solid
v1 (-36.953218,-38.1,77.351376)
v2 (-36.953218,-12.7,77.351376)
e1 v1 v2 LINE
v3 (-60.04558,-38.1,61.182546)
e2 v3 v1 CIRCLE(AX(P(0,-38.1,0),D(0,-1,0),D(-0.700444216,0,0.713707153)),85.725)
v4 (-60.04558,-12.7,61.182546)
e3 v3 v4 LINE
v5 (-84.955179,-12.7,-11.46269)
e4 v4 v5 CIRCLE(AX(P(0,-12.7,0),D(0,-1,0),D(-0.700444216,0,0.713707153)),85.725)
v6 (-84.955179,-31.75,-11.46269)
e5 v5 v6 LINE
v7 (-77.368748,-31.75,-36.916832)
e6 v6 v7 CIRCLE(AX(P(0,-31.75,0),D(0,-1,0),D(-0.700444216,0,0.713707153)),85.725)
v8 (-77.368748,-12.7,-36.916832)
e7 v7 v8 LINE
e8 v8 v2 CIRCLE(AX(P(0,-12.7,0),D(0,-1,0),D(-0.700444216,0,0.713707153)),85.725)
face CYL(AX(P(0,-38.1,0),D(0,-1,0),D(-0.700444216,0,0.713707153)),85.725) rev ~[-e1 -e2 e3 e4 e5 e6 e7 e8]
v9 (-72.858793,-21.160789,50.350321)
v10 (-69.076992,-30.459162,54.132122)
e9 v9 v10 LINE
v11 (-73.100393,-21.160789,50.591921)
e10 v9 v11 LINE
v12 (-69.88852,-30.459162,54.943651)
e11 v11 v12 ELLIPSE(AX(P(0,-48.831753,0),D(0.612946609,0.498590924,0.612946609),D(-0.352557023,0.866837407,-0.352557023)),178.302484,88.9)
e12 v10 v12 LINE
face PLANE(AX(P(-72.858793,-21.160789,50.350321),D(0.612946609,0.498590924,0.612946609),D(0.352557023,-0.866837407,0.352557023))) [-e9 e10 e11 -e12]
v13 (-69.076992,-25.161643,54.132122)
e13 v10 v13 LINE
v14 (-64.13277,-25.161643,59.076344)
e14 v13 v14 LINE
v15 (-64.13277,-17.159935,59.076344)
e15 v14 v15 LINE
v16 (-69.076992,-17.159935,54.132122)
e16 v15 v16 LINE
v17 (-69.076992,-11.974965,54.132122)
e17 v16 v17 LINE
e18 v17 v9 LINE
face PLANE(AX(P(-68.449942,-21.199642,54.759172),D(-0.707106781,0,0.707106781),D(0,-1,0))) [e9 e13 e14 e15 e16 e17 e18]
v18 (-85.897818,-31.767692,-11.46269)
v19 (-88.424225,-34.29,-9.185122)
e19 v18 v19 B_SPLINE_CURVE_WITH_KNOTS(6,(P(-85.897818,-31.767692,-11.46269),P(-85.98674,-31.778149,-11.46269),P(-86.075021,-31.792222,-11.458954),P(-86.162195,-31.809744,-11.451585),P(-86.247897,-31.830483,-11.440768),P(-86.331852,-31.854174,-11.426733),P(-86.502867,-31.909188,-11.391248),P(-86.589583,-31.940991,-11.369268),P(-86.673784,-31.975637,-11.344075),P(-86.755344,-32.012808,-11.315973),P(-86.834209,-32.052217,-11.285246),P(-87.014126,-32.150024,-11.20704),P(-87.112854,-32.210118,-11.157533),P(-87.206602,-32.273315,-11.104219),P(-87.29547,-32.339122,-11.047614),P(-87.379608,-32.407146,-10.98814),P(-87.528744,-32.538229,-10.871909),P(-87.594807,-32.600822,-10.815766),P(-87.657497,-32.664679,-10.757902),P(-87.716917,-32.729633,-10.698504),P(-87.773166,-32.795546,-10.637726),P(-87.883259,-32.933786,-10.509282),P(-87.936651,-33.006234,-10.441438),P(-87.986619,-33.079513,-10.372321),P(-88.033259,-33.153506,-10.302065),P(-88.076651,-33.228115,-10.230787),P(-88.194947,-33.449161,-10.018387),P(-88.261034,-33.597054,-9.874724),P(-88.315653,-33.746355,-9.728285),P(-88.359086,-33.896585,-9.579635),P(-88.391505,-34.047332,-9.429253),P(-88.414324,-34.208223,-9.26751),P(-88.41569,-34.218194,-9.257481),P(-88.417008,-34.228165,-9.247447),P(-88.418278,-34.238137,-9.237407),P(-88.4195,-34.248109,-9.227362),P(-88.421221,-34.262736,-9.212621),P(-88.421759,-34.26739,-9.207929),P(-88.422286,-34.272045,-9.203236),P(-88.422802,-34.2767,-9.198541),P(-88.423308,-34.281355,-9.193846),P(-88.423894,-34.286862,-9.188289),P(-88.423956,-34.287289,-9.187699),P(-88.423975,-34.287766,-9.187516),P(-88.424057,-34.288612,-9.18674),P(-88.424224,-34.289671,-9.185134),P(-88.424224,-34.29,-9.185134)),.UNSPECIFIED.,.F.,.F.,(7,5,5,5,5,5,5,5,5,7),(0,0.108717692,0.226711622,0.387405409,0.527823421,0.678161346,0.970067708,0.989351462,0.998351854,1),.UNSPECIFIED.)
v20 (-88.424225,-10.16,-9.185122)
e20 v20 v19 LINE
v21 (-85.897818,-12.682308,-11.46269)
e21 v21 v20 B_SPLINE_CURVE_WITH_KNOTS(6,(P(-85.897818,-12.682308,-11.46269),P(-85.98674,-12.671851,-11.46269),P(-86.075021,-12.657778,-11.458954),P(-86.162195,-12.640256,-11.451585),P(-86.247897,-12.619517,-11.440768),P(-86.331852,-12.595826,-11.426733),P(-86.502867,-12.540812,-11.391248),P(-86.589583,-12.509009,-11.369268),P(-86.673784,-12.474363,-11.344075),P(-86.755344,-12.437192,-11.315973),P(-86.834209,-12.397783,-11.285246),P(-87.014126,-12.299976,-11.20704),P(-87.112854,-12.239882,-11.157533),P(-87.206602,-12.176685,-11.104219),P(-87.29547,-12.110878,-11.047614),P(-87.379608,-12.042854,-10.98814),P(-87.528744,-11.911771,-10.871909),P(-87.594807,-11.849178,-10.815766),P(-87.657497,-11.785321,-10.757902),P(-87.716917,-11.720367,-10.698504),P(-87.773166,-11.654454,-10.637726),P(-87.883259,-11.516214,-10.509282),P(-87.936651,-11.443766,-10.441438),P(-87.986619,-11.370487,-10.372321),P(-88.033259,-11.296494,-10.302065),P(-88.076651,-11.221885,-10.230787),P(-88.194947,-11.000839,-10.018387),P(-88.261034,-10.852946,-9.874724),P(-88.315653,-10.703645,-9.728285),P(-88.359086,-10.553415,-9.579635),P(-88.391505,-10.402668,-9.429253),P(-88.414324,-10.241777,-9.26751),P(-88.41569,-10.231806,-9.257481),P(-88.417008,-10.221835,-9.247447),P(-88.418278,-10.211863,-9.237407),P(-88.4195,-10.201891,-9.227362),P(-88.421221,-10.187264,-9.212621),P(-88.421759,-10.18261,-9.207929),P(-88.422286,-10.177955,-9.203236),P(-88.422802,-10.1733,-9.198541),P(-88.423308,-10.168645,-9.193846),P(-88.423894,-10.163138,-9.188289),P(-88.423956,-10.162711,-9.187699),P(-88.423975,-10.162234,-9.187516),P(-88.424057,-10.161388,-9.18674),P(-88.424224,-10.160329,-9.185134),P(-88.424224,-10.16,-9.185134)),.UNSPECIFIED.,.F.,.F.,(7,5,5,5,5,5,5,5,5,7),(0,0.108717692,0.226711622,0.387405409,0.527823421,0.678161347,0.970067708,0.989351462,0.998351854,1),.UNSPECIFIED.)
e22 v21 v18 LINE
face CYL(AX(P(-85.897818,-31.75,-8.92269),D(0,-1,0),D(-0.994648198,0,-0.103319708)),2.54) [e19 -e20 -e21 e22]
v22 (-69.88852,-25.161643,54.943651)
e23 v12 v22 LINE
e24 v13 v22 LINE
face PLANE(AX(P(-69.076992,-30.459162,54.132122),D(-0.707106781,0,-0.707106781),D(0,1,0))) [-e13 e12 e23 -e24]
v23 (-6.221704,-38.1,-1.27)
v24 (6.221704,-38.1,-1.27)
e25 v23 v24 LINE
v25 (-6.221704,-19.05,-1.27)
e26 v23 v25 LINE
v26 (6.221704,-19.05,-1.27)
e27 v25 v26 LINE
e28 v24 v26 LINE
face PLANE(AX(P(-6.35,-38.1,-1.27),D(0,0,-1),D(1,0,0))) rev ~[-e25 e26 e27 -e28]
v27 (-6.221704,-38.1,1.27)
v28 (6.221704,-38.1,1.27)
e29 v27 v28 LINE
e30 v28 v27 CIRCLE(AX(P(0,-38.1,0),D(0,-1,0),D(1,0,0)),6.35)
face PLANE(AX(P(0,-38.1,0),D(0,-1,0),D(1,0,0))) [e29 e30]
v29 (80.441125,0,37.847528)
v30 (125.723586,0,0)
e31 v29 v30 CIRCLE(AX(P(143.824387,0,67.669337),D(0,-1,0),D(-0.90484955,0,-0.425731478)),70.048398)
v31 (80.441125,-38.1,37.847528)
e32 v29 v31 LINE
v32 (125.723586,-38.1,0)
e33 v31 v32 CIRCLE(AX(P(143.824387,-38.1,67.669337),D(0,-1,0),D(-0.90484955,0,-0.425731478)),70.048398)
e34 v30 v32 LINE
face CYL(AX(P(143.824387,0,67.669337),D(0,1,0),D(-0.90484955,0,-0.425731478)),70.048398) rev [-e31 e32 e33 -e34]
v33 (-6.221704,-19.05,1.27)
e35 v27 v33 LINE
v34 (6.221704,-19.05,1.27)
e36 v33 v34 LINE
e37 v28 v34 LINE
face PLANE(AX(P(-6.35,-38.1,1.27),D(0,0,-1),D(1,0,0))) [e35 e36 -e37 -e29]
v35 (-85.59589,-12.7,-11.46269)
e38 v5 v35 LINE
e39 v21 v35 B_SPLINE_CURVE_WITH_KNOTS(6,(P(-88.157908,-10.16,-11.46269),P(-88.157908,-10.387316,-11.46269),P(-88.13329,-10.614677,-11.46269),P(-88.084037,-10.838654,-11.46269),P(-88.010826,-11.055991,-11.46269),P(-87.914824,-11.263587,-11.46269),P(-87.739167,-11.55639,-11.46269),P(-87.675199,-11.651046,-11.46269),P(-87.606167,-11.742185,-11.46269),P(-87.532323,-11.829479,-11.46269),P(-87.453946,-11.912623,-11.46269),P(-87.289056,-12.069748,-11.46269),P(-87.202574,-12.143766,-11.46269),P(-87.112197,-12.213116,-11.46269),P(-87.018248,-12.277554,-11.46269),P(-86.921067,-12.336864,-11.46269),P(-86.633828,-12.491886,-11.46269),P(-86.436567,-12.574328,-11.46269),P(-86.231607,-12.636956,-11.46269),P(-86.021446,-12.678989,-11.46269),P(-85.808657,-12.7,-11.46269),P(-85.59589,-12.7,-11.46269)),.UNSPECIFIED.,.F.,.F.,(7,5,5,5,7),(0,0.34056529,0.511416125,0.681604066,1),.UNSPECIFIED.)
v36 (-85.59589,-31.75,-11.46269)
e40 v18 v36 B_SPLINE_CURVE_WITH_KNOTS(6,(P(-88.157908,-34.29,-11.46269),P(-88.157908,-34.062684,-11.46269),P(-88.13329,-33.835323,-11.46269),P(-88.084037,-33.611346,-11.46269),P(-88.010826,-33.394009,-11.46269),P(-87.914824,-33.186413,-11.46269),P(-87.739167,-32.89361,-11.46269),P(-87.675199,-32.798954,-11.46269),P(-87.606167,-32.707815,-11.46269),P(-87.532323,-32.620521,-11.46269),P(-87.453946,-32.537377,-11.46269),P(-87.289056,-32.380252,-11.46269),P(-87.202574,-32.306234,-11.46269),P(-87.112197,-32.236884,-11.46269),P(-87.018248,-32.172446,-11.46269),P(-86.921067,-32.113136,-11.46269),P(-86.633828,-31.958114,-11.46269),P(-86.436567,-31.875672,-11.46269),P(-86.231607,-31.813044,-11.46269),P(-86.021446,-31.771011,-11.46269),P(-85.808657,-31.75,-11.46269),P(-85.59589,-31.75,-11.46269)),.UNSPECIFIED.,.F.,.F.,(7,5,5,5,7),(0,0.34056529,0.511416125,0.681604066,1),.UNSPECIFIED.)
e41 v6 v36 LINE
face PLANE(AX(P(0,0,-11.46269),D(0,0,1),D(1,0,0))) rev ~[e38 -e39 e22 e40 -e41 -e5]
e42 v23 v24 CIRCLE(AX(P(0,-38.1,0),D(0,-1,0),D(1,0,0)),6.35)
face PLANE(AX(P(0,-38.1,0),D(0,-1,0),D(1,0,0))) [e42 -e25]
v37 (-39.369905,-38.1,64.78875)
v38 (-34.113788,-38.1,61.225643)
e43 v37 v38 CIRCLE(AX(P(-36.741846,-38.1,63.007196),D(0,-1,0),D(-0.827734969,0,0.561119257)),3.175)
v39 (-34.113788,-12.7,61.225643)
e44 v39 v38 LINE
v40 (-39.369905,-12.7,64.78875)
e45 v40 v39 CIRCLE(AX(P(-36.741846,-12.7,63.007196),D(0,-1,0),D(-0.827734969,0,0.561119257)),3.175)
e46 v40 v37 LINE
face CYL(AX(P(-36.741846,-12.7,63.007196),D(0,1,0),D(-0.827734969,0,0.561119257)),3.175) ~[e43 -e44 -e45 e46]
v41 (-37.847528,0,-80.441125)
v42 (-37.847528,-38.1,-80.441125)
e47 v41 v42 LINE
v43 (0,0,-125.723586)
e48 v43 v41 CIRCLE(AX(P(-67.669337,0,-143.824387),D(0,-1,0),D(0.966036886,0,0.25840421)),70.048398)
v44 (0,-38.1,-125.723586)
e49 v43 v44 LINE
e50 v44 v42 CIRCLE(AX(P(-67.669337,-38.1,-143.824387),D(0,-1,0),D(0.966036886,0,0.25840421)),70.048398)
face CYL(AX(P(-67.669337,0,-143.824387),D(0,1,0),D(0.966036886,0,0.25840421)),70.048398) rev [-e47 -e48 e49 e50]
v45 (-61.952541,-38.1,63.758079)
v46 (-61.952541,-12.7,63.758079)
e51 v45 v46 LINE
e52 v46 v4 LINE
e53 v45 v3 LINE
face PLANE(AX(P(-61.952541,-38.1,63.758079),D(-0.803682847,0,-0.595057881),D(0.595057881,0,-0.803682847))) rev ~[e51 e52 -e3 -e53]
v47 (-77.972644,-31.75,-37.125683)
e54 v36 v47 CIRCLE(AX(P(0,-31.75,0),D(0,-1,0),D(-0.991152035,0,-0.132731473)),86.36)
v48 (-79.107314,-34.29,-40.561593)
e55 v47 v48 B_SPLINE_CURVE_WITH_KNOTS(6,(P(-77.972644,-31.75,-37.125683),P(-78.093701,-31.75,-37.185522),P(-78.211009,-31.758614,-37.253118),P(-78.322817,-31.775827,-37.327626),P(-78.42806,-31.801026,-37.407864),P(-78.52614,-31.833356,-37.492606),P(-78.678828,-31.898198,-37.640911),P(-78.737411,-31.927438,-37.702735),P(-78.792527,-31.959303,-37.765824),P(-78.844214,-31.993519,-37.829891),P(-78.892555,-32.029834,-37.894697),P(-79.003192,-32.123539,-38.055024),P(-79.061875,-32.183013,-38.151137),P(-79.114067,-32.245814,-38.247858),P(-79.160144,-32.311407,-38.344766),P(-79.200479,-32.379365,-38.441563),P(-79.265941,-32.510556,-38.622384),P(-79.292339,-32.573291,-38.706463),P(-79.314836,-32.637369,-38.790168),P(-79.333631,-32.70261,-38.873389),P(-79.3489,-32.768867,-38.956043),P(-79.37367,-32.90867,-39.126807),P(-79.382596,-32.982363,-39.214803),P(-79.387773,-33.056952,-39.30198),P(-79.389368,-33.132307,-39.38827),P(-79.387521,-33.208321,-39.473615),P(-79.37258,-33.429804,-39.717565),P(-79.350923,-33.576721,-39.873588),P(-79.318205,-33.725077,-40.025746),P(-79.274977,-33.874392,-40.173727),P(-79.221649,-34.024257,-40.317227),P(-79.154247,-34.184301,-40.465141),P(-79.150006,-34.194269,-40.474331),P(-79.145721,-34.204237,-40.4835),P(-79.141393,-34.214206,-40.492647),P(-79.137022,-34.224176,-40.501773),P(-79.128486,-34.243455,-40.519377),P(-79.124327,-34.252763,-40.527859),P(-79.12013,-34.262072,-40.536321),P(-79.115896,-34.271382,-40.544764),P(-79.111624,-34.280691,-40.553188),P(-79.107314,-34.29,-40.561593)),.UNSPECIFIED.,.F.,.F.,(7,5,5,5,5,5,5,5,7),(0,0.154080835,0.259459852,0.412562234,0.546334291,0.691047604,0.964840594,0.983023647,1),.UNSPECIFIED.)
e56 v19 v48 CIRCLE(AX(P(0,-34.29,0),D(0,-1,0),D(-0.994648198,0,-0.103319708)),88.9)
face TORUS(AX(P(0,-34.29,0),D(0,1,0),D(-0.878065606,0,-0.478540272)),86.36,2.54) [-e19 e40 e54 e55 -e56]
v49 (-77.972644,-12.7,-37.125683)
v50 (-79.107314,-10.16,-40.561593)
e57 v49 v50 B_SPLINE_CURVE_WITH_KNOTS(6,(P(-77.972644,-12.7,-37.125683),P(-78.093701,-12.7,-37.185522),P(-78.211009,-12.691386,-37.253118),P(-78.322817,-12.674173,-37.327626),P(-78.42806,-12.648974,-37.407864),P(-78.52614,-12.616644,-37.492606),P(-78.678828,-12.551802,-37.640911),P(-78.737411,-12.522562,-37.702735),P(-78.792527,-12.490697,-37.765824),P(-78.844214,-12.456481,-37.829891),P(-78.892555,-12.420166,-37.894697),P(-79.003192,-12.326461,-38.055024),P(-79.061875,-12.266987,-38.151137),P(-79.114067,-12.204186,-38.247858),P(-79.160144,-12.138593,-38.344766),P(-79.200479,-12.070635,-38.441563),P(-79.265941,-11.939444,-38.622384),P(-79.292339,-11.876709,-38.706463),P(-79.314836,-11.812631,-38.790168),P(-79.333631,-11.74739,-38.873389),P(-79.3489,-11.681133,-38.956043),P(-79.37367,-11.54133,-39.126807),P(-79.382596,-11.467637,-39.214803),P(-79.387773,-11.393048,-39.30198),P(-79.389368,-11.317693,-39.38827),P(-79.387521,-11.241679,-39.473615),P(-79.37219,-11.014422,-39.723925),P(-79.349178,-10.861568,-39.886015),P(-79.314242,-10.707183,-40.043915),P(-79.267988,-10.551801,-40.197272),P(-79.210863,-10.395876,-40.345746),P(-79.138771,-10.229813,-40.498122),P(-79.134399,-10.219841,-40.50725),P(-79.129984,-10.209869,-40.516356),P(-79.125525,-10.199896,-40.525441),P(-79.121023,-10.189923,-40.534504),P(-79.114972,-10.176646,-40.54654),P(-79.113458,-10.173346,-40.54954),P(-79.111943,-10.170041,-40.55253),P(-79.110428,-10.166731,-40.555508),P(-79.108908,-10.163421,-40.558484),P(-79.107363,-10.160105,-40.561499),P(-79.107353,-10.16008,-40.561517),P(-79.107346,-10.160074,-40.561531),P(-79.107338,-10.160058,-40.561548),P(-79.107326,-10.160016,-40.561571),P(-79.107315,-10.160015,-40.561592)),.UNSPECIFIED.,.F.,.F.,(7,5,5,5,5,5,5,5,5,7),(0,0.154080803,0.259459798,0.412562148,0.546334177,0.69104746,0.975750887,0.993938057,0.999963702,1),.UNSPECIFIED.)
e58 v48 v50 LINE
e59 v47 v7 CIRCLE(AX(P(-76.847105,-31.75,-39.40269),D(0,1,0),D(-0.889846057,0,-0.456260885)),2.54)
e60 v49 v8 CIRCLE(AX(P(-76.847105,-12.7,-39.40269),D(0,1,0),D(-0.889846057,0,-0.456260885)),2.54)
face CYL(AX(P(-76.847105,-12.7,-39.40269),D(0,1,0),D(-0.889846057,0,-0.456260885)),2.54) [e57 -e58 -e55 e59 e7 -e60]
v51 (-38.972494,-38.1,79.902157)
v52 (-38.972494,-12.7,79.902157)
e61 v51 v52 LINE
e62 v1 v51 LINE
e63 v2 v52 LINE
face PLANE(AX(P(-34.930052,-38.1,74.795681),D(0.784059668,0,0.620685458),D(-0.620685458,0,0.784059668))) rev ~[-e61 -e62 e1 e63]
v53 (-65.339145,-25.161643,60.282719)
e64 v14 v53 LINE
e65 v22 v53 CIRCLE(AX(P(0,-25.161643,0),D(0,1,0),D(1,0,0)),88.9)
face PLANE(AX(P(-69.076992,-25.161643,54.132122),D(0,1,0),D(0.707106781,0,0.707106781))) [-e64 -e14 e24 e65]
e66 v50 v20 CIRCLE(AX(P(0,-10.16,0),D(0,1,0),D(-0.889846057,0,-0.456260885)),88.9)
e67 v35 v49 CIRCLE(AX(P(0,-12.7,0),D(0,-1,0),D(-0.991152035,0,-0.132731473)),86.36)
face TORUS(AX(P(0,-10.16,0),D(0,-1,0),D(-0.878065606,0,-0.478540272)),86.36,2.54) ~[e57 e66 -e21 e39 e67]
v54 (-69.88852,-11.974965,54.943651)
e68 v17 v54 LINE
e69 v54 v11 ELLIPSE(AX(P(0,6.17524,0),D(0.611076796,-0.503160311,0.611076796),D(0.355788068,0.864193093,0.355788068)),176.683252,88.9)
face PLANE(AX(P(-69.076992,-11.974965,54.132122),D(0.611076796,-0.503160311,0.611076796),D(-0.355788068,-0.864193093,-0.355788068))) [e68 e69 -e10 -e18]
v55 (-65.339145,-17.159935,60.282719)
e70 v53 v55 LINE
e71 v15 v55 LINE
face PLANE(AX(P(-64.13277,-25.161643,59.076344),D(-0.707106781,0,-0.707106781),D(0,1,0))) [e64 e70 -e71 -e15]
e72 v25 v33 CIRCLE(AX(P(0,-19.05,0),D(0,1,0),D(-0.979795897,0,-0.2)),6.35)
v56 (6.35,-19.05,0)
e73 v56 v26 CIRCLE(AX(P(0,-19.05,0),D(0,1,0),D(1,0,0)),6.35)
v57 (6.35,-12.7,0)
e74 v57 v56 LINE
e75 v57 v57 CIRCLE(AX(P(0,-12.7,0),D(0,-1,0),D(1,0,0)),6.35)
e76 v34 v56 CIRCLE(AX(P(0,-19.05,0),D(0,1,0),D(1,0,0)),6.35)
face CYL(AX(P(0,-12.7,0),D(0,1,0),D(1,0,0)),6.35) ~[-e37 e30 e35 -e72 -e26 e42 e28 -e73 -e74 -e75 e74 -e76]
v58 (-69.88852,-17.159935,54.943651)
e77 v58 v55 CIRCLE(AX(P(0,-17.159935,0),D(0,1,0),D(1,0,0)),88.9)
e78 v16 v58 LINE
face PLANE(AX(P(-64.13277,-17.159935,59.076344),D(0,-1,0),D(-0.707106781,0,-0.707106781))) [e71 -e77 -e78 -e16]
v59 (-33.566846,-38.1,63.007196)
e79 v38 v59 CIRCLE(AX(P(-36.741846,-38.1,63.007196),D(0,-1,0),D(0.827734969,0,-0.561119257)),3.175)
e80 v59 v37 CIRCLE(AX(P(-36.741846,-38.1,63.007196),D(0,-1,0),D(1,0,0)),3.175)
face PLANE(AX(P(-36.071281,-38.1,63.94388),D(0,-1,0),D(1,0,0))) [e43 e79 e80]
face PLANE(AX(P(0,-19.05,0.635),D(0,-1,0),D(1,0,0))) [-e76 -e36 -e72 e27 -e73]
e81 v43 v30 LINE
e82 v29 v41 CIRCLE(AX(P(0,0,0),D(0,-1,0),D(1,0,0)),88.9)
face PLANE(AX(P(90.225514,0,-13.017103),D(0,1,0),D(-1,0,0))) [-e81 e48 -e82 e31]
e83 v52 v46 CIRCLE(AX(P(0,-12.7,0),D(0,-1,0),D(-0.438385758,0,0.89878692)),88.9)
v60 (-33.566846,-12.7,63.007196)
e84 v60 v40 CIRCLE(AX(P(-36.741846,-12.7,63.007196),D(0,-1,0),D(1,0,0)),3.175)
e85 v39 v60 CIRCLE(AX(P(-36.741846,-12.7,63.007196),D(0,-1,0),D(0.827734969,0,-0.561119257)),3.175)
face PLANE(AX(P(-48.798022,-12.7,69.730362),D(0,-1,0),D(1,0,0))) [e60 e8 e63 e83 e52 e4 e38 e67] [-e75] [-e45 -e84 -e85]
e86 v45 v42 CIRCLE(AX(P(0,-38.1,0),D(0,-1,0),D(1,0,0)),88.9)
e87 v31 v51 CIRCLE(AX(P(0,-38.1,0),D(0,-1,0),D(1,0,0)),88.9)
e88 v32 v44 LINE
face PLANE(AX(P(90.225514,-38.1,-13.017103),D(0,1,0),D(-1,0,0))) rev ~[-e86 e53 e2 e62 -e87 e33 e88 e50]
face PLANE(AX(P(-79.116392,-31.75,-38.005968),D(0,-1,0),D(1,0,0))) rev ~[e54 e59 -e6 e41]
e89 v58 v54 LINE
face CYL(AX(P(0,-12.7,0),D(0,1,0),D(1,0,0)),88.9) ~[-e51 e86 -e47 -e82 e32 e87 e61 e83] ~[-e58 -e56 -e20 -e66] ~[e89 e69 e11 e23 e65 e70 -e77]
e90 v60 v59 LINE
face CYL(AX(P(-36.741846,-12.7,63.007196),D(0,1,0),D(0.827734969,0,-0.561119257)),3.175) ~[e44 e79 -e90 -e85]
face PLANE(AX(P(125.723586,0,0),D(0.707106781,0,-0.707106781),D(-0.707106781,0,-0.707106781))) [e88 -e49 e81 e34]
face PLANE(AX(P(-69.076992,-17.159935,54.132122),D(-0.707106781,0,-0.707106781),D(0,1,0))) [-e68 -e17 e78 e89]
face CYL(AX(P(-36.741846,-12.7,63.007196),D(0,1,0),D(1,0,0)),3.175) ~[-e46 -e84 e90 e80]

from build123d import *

# Parameters (mm, degrees)
F0_R          = 88.9
F1_DEPTH      = 12.7
F2_R          = 88.9
F2_R_2        = 82.55
F2_R_3        = 6.35
F3_DEPTH      = 25.4
F5_DEPTH      = 25.4
F7_DEPTH      = 25.4
F8_W          = 12.7
F8_H          = 1.27
F9_DEPTH      = 19.05
F10_W         = 19.05
F10_H         = 25.4
F11_DEPTH     = 88.901
F12_T1_DEPTH  = 19.05
F12_T6_ANGLE  = 25.274429264
F12_T12_ANGLE = 25.274429264
F12_T19_ANGLE = 25.274429264
F12_T23_DEPTH = 24.7827133537
F12_T30_ANGLE = 25.274429264
F12_T34_DEPTH = 24.7827133537
F12_T41_DEPTH = 29.3229812516
F12_T45_ANGLE = 25.274429264
F12_T52_ANGLE = 25.274429264
F12_T56_DEPTH = 29.3229812516
F14_DEPTH     = 25.4
F16_DEPTH     = 38.1
F20_DEPTH     = 25.4


# Not quite as in the source:
# - a fillet or chamfer that OpenCascade refuses, or shapes differently, is made with other operations: its cross-section is extruded or revolved along the edge and cut away or added


with BuildPart() as f1:
    # F0 (on Front) → F1 (new body)
    with BuildSketch(Plane.XZ):
        Circle(F0_R)
    extrude(amount=F1_DEPTH)

    # F2 (on face) → F3 (join)
    with BuildSketch(Plane.XZ.offset(12.7)):
        Circle(F2_R)
        Circle(F2_R_2, mode=Mode.SUBTRACT)
        Circle(F2_R_3)
    extrude(amount=F3_DEPTH)

    # F4 (on face) → F5 (cut)
    with BuildSketch(Plane.XZ.offset(38.1)):
        with BuildLine():
            Line((-34.9300524425, 74.7956812681), (-38.9724939218, 79.9021571518))
            ThreePointArc((-38.9724939218, 79.9021571518), (-51.1040456605, 72.7432919047), (-61.9525410202, 63.7580791833))
            Line((-61.9525410202, 63.7580791833), (-58.1372414147, 58.6051504621))
            ThreePointArc((-58.1372414147, 58.6051504621), (-47.2325482948, 67.7022073612), (-34.9300524425, 74.7956812681))
        make_face()
    extrude(amount=-F5_DEPTH, mode=Mode.SUBTRACT)

    # F6 (on face) → F7 (join)
    with BuildSketch(Plane.XZ.offset(12.7)):
        with BuildLine():
            ThreePointArc((-33.5668462981, 63.0071964846), (-35.8100364522, 66.042382708), (-39.3699048248, 64.7887501268))
            Line((-39.3699048248, 64.7887501268), (-34.1137877714, 61.2256428423))
            ThreePointArc((-34.1137877714, 61.2256428423), (-33.7066600747, 62.0753866387), (-33.5668462981, 63.0071964846))
        make_face()
        with BuildLine():
            Line((-34.1137877714, 61.2256428423), (-39.3699048248, 64.7887501268))
            ThreePointArc((-39.3699048248, 64.7887501268), (-38.5233999404, 60.3791379579), (-34.1137877714, 61.2256428423))
        make_face()
    extrude(amount=F7_DEPTH)

    # F8 (on face) → F9 (cut)
    with BuildSketch(Plane.XZ.offset(38.1)):
        with Locations((0, 0.635)):
            Rectangle(F8_W, F8_H)
        with Locations((0, -0.635)):
            Rectangle(F8_W, F8_H)
    extrude(amount=-F9_DEPTH, mode=Mode.SUBTRACT)

    # F10 (on Right) → F11 (cut, through all)
    with BuildSketch(Plane.YZ):
        with Locations((-22.225, -24.1626900017)):
            Rectangle(F10_W, F10_H)
    extrude(amount=-F11_DEPTH, mode=Mode.SUBTRACT)

    # F12: fillet of radius 2.54 on 4 edges, made by hand

    # F12_s2 → F12_t1 (cut)
    with BuildSketch(Plane.XZ.offset(12.7)):
        with BuildLine():
            ThreePointArc((-88.4242248071, -9.1851220606), (-87.5985568369, -10.8092447226), (-85.897818384, -11.4626900017))
            Line((-85.897818384, -11.4626900017), (-88.1579079716, -11.4626900017))
            ThreePointArc((-88.1579079716, -11.4626900017), (-88.2984101391, -10.3247647385), (-88.4242248071, -9.1851220606))
        make_face()
        with BuildLine():
            ThreePointArc((-79.1073144645, -40.5615926488), (-79.0145016969, -38.078305753), (-76.8471054798, -36.8626900017))
            Line((-76.8471054798, -36.8626900017), (-80.8971698259, -36.8626900017))
            ThreePointArc((-80.8971698259, -36.8626900017), (-80.0236166295, -38.7224841861), (-79.1073144645, -40.5615926488))
        make_face()
    extrude(amount=F12_T1_DEPTH, mode=Mode.SUBTRACT)


with BuildPart() as f12_tool4:
    # F12_s5 → F12_t6 (revolve)
    with BuildSketch(Plane(origin=(0, 0, 0), x_dir=(0, 1, 0), z_dir=(0.478540272, 0, -0.8780656058))):
        with BuildLine():
            ThreePointArc((-10.16, -88.9), (-11.9560512242, -88.1560512242), (-12.7, -86.36))
            Line((-12.7, -86.36), (-12.7, -88.9))
            Line((-12.7, -88.9), (-10.16, -88.9))
        make_face()
    revolve(axis=Axis((0, -12.7, 0), (0, 1, 0)), revolution_arc=F12_T6_ANGLE)

    split(bisect_by=Plane.XY.offset(-11.4626900017), keep=Keep.BOTTOM)

    split(bisect_by=Plane.XY.offset(-36.8626900017), keep=Keep.TOP)


with BuildPart() as f1_1:
    add(f1.part)

    # F12_t3: cut F12_tool4
    add(f12_tool4.part, mode=Mode.SUBTRACT)


with BuildPart() as f12_tool10:
    # F12_s11 → F12_t12 (revolve)
    with BuildSketch(Plane(origin=(0, 0, 0), x_dir=(0, 1, 0), z_dir=(0.478540272, 0, -0.8780656058))):
        with BuildLine():
            ThreePointArc((-34.29, -88.9), (-32.4939487758, -88.1560512242), (-31.75, -86.36))
            Line((-31.75, -86.36), (-31.75, -88.9))
            Line((-31.75, -88.9), (-34.29, -88.9))
        make_face()
    revolve(axis=Axis((0, -31.75, 0), (0, 1, 0)), revolution_arc=F12_T12_ANGLE)

    split(bisect_by=Plane.XY.offset(-36.8626900017), keep=Keep.TOP)

    split(bisect_by=Plane.XY.offset(-11.4626900017), keep=Keep.BOTTOM)


with BuildPart() as f1_2:
    add(f1_1.part)

    # F12_t9: cut F12_tool10
    add(f12_tool10.part, mode=Mode.SUBTRACT)


with BuildPart() as f12_tool17:
    # F12_s18 → F12_t19 (revolve)
    with BuildSketch(Plane(origin=(0, 0, 0), x_dir=(0, 1, 0), z_dir=(0.478540272, 0, -0.8780656058))):
        with BuildLine():
            ThreePointArc((-34.29, -88.9), (-32.4939487758, -88.1560512242), (-31.75, -86.36))
            Line((-31.75, -86.36), (-31.75, -88.9))
            Line((-31.75, -88.9), (-34.29, -88.9))
        make_face()
    revolve(axis=Axis((0, -31.75, 0), (0, 1, 0)), revolution_arc=F12_T19_ANGLE)

    split(bisect_by=Plane.XY.offset(-11.4626900017), keep=Keep.TOP)


with BuildPart() as f12_tool21:
    # F12_s22 → F12_t23 (new body)
    with BuildSketch(Plane.XZ.offset(37.4827133537)):
        with BuildLine():
            ThreePointArc((-88.4242248071, -9.1851220606), (-87.5985568369, -10.8092447226), (-85.897818384, -11.4626900017))
            Line((-85.897818384, -11.4626900017), (-88.1579079716, -11.4626900017))
            ThreePointArc((-88.1579079716, -11.4626900017), (-88.2984101391, -10.3247647385), (-88.4242248071, -9.1851220606))
        make_face()
    extrude(amount=-F12_T23_DEPTH)

    split(bisect_by=Plane.XZ.offset(31.75), keep=Keep.TOP)


with BuildPart() as f12_tool17_1:
    add(f12_tool17.part)

    # F12_t25: intersect F12_tool21
    add(f12_tool21.part, mode=Mode.INTERSECT)


with BuildPart() as f1_3:
    add(f1_2.part)

    # F12_t15: cut F12_tool17
    add(f12_tool17_1.part, mode=Mode.SUBTRACT)


with BuildPart() as f12_tool28:
    # F12_s29 → F12_t30 (revolve)
    with BuildSketch(Plane(origin=(0, 0, 0), x_dir=(0, 1, 0), z_dir=(0.478540272, 0, -0.8780656058))):
        with BuildLine():
            ThreePointArc((-10.16, -88.9), (-11.9560512242, -88.1560512242), (-12.7, -86.36))
            Line((-12.7, -86.36), (-12.7, -88.9))
            Line((-12.7, -88.9), (-10.16, -88.9))
        make_face()
    revolve(axis=Axis((0, -12.7, 0), (0, 1, 0)), revolution_arc=F12_T30_ANGLE)

    split(bisect_by=Plane.XY.offset(-11.4626900017), keep=Keep.TOP)


with BuildPart() as f12_tool32:
    # F12_s33 → F12_t34 (new body)
    with BuildSketch(Plane.XZ.offset(31.75)):
        with BuildLine():
            ThreePointArc((-88.4242248071, -9.1851220606), (-87.5985568369, -10.8092447226), (-85.897818384, -11.4626900017))
            Line((-85.897818384, -11.4626900017), (-88.1579079716, -11.4626900017))
            ThreePointArc((-88.1579079716, -11.4626900017), (-88.2984101391, -10.3247647385), (-88.4242248071, -9.1851220606))
        make_face()
    extrude(amount=-F12_T34_DEPTH)

    split(bisect_by=Plane.XZ.offset(12.7), keep=Keep.BOTTOM)


with BuildPart() as f12_tool28_1:
    add(f12_tool28.part)

    # F12_t36: intersect F12_tool32
    add(f12_tool32.part, mode=Mode.INTERSECT)


with BuildPart() as f1_4:
    add(f1_3.part)

    # F12_t26: cut F12_tool28
    add(f12_tool28_1.part, mode=Mode.SUBTRACT)


with BuildPart() as f12_tool39:
    # F12_s40 → F12_t41 (new body)
    with BuildSketch(Plane.XZ.offset(31.75)):
        with BuildLine():
            ThreePointArc((-79.1073144645, -40.5615926488), (-79.0145016969, -38.078305753), (-76.8471054798, -36.8626900017))
            Line((-76.8471054798, -36.8626900017), (-80.8971698259, -36.8626900017))
            ThreePointArc((-80.8971698259, -36.8626900017), (-80.0236166295, -38.7224841861), (-79.1073144645, -40.5615926488))
        make_face()
    extrude(amount=-F12_T41_DEPTH)

    split(bisect_by=Plane.XZ.offset(12.7), keep=Keep.BOTTOM)


with BuildPart() as f12_tool43:
    # F12_s44 → F12_t45 (revolve)
    with BuildSketch(Plane(origin=(0, 0, 0), x_dir=(0, 1, 0), z_dir=(0.478540272, 0, -0.8780656058))):
        with BuildLine():
            ThreePointArc((-10.16, -88.9), (-11.9560512242, -88.1560512242), (-12.7, -86.36))
            Line((-12.7, -86.36), (-12.7, -88.9))
            Line((-12.7, -88.9), (-10.16, -88.9))
        make_face()
    revolve(axis=Axis((0, -12.7, 0), (0, 1, 0)), revolution_arc=F12_T45_ANGLE)

    split(bisect_by=Plane.XY.offset(-36.8626900017), keep=Keep.BOTTOM)


with BuildPart() as f12_tool39_1:
    add(f12_tool39.part)

    # F12_t47: intersect F12_tool43
    add(f12_tool43.part, mode=Mode.INTERSECT)


with BuildPart() as f1_5:
    add(f1_4.part)

    # F12_t37: cut F12_tool39
    add(f12_tool39_1.part, mode=Mode.SUBTRACT)


with BuildPart() as f12_tool50:
    # F12_s51 → F12_t52 (revolve)
    with BuildSketch(Plane(origin=(0, 0, 0), x_dir=(0, 1, 0), z_dir=(0.478540272, 0, -0.8780656058))):
        with BuildLine():
            ThreePointArc((-34.29, -88.9), (-32.4939487758, -88.1560512242), (-31.75, -86.36))
            Line((-31.75, -86.36), (-31.75, -88.9))
            Line((-31.75, -88.9), (-34.29, -88.9))
        make_face()
    revolve(axis=Axis((0, -31.75, 0), (0, 1, 0)), revolution_arc=F12_T52_ANGLE)

    split(bisect_by=Plane.XY.offset(-36.8626900017), keep=Keep.BOTTOM)


with BuildPart() as f12_tool54:
    # F12_s55 → F12_t56 (new body)
    with BuildSketch(Plane.XZ.offset(42.0229812516)):
        with BuildLine():
            ThreePointArc((-79.1073144645, -40.5615926488), (-79.0145016969, -38.078305753), (-76.8471054798, -36.8626900017))
            Line((-76.8471054798, -36.8626900017), (-80.8971698259, -36.8626900017))
            ThreePointArc((-80.8971698259, -36.8626900017), (-80.0236166295, -38.7224841861), (-79.1073144645, -40.5615926488))
        make_face()
    extrude(amount=-F12_T56_DEPTH)

    split(bisect_by=Plane.XZ.offset(31.75), keep=Keep.TOP)


with BuildPart() as f12_tool50_1:
    add(f12_tool50.part)

    # F12_t58: intersect F12_tool54
    add(f12_tool54.part, mode=Mode.INTERSECT)


with BuildPart() as f1_6:
    add(f1_5.part)

    # F12_t48: cut F12_tool50
    add(f12_tool50_1.part, mode=Mode.SUBTRACT)

    # F13 (on face) → F14 (cut)
    with BuildSketch(Plane.XZ.offset(38.1)):
        with BuildLine():
            ThreePointArc((-34.9300524425, 74.7956812681), (44.3341102926, 69.6346836323), (82.55, 0))
            ThreePointArc((82.55, 0), (-31.7432923719, -76.2027944986), (-58.1372414147, 58.6051504621))
            Line((-58.1372414147, 58.6051504621), (-60.0455804339, 61.1825456757))
            ThreePointArc((-60.0455804339, 61.1825456757), (-33.1765598149, -79.0448701931), (85.725, 0))
            ThreePointArc((85.725, 0), (45.721772873, 72.5141028376), (-36.9532177975, 77.3513756788))
            Line((-36.9532177975, 77.3513756788), (-34.9300524425, 74.7956812681))
        make_face()
    extrude(amount=-F14_DEPTH, mode=Mode.SUBTRACT)

    # F15 (on face) → F16 (join)
    with BuildSketch(Plane(origin=(0, 0, 0), x_dir=(-1, 0, 0), z_dir=(0, 1, 0))):
        with BuildLine():
            Line((-125.723585695, 0), (-62.8617928475, -62.8617928475))
            ThreePointArc((-62.8617928475, -62.8617928475), (-87.5758152323, -15.286810864), (-80.4411250184, 37.8475283972))
            ThreePointArc((-80.4411250184, 37.8475283972), (-98.9019872856, 13.9221865314), (-125.723585695, 0))
        make_face()
        with BuildLine():
            ThreePointArc((37.8475283972, -80.4411250184), (19.3906418907, -86.7595124875), (0, -88.9))
            ThreePointArc((0, -88.9), (-34.0205571373, -82.1328904403), (-62.8617928475, -62.8617928475))
            Line((-62.8617928475, -62.8617928475), (0, -125.723585695))
            ThreePointArc((0, -125.723585695), (13.9221865314, -98.9019872856), (37.8475283972, -80.4411250184))
        make_face()
    extrude(amount=-F16_DEPTH)

    # F19 (on face) → F20 (cut)
    with BuildSketch(Plane(origin=(-61.6045569905, 0, 61.6045569905), x_dir=(0, -1, 0), z_dir=(-0.7071067812, 0, 0.7071067812))):
        Polygon((25.1616425812, -3.5754330456), (17.159935087, -3.5754330456), (17.159935087, -10.567618534), (11.9749652222, -10.567618534), (21.1607888341, -15.9158930182), (30.4591618478, -10.567618534), (25.1616425812, -10.567618534), align=None)
    extrude(amount=F20_DEPTH, mode=Mode.SUBTRACT)


solid = f1_6.part
